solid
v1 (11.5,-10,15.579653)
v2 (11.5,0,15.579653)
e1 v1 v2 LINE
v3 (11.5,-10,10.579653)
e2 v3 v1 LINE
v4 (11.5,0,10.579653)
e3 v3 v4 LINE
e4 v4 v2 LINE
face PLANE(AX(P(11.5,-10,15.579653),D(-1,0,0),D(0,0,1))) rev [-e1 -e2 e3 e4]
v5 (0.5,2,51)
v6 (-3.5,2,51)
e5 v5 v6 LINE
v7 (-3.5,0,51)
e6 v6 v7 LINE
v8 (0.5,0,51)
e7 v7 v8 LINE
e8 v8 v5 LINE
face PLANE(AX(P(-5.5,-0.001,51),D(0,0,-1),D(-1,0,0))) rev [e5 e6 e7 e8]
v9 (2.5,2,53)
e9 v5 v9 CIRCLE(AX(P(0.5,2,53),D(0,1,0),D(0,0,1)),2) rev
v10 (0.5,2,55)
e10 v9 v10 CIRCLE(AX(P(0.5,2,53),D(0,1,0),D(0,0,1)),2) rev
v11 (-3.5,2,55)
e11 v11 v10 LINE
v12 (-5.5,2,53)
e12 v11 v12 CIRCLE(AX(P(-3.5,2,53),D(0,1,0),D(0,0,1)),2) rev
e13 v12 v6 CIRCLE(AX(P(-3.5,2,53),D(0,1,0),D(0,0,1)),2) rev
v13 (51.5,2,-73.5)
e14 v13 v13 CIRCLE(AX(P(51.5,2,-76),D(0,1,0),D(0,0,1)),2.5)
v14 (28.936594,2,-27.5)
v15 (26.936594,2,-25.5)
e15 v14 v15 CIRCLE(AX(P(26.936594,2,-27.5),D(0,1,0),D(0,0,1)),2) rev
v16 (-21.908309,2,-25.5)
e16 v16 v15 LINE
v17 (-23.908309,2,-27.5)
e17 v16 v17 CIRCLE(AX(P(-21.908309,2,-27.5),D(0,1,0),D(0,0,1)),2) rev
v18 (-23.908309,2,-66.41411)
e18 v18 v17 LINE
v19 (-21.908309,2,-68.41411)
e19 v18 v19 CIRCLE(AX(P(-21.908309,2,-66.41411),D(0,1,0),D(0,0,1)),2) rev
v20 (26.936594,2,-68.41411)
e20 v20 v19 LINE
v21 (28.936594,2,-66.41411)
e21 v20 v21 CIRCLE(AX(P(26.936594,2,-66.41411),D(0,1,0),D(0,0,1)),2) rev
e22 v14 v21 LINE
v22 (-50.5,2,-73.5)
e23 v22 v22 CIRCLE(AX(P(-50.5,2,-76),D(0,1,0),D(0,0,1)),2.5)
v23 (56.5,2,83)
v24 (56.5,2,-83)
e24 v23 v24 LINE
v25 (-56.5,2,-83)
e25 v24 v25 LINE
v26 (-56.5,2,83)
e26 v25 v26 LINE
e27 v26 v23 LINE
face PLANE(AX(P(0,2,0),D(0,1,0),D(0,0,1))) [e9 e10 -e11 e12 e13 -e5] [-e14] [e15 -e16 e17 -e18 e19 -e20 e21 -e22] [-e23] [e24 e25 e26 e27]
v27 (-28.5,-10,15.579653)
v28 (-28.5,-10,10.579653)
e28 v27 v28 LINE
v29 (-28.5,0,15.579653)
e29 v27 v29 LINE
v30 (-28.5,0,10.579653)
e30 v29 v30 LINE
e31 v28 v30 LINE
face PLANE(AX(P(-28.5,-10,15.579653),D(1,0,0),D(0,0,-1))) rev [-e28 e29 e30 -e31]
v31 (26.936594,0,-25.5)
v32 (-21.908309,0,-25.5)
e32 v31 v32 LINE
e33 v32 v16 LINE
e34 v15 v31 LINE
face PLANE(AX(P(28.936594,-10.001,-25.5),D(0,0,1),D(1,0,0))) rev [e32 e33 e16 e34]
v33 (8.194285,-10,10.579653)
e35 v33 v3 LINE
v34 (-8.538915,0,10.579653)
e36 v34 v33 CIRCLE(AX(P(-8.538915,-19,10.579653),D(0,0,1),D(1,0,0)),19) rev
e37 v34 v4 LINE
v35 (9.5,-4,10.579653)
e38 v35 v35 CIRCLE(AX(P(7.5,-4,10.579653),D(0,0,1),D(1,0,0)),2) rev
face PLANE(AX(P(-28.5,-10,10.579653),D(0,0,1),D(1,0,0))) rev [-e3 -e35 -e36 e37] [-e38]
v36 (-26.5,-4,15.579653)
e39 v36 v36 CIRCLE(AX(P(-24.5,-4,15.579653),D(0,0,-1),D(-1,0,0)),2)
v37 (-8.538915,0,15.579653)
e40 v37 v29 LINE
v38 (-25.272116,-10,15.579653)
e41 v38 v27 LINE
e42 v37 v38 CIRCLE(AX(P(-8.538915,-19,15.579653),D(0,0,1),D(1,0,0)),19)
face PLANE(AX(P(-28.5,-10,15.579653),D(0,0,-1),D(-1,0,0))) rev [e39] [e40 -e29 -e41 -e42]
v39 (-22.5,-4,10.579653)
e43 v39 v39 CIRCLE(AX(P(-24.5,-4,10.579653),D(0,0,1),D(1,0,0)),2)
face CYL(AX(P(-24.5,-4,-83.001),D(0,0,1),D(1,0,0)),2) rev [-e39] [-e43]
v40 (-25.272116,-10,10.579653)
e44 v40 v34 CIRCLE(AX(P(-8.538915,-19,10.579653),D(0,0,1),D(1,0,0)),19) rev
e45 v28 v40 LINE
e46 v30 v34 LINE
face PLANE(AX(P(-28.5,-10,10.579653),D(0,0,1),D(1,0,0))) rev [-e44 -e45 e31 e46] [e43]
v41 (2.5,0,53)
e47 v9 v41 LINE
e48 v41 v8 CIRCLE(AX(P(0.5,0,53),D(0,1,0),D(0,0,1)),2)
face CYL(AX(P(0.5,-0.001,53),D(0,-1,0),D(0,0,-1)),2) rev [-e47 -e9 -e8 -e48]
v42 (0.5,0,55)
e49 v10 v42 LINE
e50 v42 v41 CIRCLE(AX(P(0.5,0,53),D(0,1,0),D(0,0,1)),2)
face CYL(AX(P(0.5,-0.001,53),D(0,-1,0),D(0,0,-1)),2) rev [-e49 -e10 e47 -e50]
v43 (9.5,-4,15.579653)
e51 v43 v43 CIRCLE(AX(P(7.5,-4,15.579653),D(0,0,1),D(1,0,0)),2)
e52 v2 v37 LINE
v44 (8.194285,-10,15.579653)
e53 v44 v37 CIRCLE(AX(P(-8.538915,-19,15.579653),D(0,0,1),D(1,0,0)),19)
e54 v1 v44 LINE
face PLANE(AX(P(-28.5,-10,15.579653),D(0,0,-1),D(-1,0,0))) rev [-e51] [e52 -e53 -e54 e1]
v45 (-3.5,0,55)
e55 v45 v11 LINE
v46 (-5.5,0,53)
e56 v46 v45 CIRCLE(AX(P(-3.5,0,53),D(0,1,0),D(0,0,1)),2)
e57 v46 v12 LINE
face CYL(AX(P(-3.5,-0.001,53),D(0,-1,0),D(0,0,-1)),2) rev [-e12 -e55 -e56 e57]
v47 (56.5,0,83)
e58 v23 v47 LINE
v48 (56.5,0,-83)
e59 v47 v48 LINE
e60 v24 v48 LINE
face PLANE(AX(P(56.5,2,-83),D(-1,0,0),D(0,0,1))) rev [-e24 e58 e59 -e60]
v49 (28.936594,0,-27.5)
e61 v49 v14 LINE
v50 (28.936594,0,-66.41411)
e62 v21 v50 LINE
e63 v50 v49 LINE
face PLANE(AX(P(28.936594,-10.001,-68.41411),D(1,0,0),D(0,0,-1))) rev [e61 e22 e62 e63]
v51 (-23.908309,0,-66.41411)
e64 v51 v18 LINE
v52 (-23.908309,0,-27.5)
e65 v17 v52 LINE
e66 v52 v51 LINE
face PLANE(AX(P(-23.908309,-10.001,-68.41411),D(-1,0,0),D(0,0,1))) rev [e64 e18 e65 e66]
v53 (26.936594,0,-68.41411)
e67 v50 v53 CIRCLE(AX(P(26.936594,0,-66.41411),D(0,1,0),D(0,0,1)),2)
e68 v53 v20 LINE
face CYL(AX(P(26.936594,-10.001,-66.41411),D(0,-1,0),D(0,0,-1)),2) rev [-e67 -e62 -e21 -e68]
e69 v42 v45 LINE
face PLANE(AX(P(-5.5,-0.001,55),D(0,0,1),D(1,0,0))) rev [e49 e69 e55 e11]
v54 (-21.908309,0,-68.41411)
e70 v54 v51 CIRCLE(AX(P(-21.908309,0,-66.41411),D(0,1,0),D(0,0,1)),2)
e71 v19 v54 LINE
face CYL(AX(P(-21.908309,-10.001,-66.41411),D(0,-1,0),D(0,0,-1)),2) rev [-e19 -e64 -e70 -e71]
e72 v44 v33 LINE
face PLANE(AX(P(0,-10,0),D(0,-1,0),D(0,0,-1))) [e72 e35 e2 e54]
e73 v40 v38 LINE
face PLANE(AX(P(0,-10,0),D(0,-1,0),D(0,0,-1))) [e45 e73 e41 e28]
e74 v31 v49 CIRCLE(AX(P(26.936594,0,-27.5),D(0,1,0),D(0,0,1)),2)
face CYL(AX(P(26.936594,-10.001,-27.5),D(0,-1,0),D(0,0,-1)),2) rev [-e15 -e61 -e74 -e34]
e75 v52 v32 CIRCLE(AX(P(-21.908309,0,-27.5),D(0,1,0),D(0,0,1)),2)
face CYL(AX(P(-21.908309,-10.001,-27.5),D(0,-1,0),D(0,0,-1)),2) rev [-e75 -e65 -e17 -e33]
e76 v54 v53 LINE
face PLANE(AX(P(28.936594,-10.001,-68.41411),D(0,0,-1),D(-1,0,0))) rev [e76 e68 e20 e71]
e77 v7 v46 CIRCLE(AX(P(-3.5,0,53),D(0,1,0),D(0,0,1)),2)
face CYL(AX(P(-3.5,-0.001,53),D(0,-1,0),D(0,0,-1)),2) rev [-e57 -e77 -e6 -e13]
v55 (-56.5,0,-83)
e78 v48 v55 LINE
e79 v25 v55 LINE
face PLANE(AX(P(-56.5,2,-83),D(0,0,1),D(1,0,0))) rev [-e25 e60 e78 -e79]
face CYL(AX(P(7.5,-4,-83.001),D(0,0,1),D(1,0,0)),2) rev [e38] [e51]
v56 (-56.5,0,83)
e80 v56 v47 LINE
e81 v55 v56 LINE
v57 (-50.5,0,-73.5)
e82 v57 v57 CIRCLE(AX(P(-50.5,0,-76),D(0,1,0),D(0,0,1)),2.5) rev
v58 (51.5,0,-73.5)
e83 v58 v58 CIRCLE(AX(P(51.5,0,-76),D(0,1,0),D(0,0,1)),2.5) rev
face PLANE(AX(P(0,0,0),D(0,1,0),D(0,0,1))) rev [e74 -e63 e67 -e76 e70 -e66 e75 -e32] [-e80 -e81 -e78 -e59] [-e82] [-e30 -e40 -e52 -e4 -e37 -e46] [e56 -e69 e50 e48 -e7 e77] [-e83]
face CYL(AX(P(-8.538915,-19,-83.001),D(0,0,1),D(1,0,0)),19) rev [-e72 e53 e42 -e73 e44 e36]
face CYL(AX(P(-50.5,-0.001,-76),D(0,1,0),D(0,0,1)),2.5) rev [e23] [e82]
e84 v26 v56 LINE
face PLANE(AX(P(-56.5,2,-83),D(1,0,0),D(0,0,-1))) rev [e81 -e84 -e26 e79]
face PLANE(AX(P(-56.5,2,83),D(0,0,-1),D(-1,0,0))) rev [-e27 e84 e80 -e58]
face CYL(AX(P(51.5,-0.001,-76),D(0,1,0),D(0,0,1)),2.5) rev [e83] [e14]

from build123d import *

# Parameters (mm, degrees)
SKETCH1_W           = 113
SKETCH1_H           = 166
BOSS_EXTRUDE1_DEPTH = 2
CUT_EXTRUDE1_REACH  = 102.425
SKETCH2_R           = 2.5
SKETCH2_W           = 8
SKETCH2_H           = 4
FILLET1_R           = 2
SKETCH3_W           = 40
SKETCH3_H           = 5
BOSS_EXTRUDE2_DEPTH = 10
CUT_EXTRUDE2_REACH  = 116.062
SKETCH5_R           = 19
CUT_EXTRUDE3_REACH  = 116.062
SKETCH6_R           = 2
CUT_EXTRUDE4_REACH  = 103.12
SKETCH7_W           = 52.844902502
SKETCH7_H           = 42.914109563
FILLET2_R           = 2


with BuildPart() as part:
    # Sketch1 → Boss-Extrude1 (new body)
    with BuildSketch(Plane(origin=(0, 0, 0), x_dir=(1, 0, 0), z_dir=(0, 1, 0))):
        Rectangle(SKETCH1_W, SKETCH1_H)
    extrude(amount=BOSS_EXTRUDE1_DEPTH)

    # Sketch2 → Cut-Extrude1 (cut, up to next)
    with BuildSketch(Plane(origin=(0, 2, 0), x_dir=(1, 0, 0), z_dir=(0, 1, 0)), mode=Mode.PRIVATE) as cut_extrude1_sk1:
        with Locations(Location((51.5, 76, 0), (0, 0, 270))):
            Circle(SKETCH2_R)
    cut_extrude1_tool1 = extrude(cut_extrude1_sk1.sketch, amount=-CUT_EXTRUDE1_REACH, mode=Mode.PRIVATE) & part.part
    # Sketch2 → Cut-Extrude1 (cut, up to next)
    with BuildSketch(Plane(origin=(0, 2, 0), x_dir=(1, 0, 0), z_dir=(0, 1, 0)), mode=Mode.PRIVATE) as cut_extrude1_sk2:
        with Locations(Location((-50.5, 76, 0), (0, 0, 270))):
            Circle(SKETCH2_R)
    cut_extrude1_tool2 = extrude(cut_extrude1_sk2.sketch, amount=-CUT_EXTRUDE1_REACH, mode=Mode.PRIVATE) & part.part
    # Sketch2 → Cut-Extrude1 (cut, up to next)
    with BuildSketch(Plane(origin=(0, 2, 0), x_dir=(1, 0, 0), z_dir=(0, 1, 0)), mode=Mode.PRIVATE) as cut_extrude1_sk3:
        with Locations((-1.5, -53)):
            Rectangle(SKETCH2_W, SKETCH2_H)
    cut_extrude1_tool3 = extrude(cut_extrude1_sk3.sketch, amount=-CUT_EXTRUDE1_REACH, mode=Mode.PRIVATE) & part.part
    add(cut_extrude1_tool1.solids().sort_by_distance((51.5, 2, -76))[0], mode=Mode.SUBTRACT)
    add(cut_extrude1_tool2.solids().sort_by_distance((-50.5, 2, -76))[0], mode=Mode.SUBTRACT)
    add(cut_extrude1_tool3.solids().sort_by_distance((-1.5, 2, 53))[0], mode=Mode.SUBTRACT)

    # Fillet1
    fillet1_edges = [part.edges().sort_by_distance(p)[0] for p in [
        (-5.5, 1, 55),
        (-5.5, 1, 51),
        (2.5, 1, 55),
        (2.5, 1, 51),
    ]]
    fillet(fillet1_edges, radius=FILLET1_R - 0.0001)  # a hair under: the kernel refuses the full size

    # Sketch3 → Boss-Extrude2 (add)
    with BuildSketch(Plane.XZ):
        with Locations((-8.5, 13.079652709)):
            Rectangle(SKETCH3_W, SKETCH3_H)
    extrude(amount=BOSS_EXTRUDE2_DEPTH)

    # Sketch5 → Cut-Extrude2 (cut, up to next)
    with BuildSketch(Plane.XY.offset(15.579652709), mode=Mode.PRIVATE) as cut_extrude2_sk1:
        with Locations((-8.538915201, -19)):
            Circle(SKETCH5_R)
    cut_extrude2_tool1 = extrude(cut_extrude2_sk1.sketch, amount=-CUT_EXTRUDE2_REACH, mode=Mode.PRIVATE) & part.part
    add(cut_extrude2_tool1.solids().sort_by_distance((-8.538915, -19, 15.579653))[0], mode=Mode.SUBTRACT)

    # Sketch6 → Cut-Extrude3 (cut, up to next)
    with BuildSketch(Plane.XY.offset(15.579652709), mode=Mode.PRIVATE) as cut_extrude3_sk1:
        with Locations((7.5, -4)):
            Circle(SKETCH6_R)
    cut_extrude3_tool1 = extrude(cut_extrude3_sk1.sketch, amount=-CUT_EXTRUDE3_REACH, mode=Mode.PRIVATE) & part.part
    cut_extrude3 = cut_extrude3_tool1.solids().sort_by_distance((7.5, -4, 15.579653))[0]
    add(cut_extrude3, mode=Mode.SUBTRACT)

    # Mirror1: Cut-Extrude3 across plane
    add(cut_extrude3.mirror(Plane(origin=(-8.5, 0, 0), x_dir=(0, 0, 1), z_dir=(1, 0, 0))), mode=Mode.SUBTRACT)

    # Sketch7 → Cut-Extrude4 (cut, up to next)
    with BuildSketch(Plane(origin=(0, 2, 0), x_dir=(1, 0, 0), z_dir=(0, 1, 0)), mode=Mode.PRIVATE) as cut_extrude4_sk1:
        with Locations((2.514142356, 46.957054782)):
            Rectangle(SKETCH7_W, SKETCH7_H)
    cut_extrude4_tool1 = extrude(cut_extrude4_sk1.sketch, amount=-CUT_EXTRUDE4_REACH, mode=Mode.PRIVATE) & part.part
    add(cut_extrude4_tool1.solids().sort_by_distance((2.514142, 2, -46.957055))[0], mode=Mode.SUBTRACT)

    # Fillet2
    fillet2_edges = [part.edges().sort_by_distance(p)[0] for p in [
        (28.936593607, 1, -68.414109563),
        (28.936593607, 1, -25.5),
        (-23.908308895, 1, -25.5),
        (-23.908308895, 1, -68.414109563),
    ]]
    fillet(fillet2_edges, radius=FILLET2_R)


solid = part.part
